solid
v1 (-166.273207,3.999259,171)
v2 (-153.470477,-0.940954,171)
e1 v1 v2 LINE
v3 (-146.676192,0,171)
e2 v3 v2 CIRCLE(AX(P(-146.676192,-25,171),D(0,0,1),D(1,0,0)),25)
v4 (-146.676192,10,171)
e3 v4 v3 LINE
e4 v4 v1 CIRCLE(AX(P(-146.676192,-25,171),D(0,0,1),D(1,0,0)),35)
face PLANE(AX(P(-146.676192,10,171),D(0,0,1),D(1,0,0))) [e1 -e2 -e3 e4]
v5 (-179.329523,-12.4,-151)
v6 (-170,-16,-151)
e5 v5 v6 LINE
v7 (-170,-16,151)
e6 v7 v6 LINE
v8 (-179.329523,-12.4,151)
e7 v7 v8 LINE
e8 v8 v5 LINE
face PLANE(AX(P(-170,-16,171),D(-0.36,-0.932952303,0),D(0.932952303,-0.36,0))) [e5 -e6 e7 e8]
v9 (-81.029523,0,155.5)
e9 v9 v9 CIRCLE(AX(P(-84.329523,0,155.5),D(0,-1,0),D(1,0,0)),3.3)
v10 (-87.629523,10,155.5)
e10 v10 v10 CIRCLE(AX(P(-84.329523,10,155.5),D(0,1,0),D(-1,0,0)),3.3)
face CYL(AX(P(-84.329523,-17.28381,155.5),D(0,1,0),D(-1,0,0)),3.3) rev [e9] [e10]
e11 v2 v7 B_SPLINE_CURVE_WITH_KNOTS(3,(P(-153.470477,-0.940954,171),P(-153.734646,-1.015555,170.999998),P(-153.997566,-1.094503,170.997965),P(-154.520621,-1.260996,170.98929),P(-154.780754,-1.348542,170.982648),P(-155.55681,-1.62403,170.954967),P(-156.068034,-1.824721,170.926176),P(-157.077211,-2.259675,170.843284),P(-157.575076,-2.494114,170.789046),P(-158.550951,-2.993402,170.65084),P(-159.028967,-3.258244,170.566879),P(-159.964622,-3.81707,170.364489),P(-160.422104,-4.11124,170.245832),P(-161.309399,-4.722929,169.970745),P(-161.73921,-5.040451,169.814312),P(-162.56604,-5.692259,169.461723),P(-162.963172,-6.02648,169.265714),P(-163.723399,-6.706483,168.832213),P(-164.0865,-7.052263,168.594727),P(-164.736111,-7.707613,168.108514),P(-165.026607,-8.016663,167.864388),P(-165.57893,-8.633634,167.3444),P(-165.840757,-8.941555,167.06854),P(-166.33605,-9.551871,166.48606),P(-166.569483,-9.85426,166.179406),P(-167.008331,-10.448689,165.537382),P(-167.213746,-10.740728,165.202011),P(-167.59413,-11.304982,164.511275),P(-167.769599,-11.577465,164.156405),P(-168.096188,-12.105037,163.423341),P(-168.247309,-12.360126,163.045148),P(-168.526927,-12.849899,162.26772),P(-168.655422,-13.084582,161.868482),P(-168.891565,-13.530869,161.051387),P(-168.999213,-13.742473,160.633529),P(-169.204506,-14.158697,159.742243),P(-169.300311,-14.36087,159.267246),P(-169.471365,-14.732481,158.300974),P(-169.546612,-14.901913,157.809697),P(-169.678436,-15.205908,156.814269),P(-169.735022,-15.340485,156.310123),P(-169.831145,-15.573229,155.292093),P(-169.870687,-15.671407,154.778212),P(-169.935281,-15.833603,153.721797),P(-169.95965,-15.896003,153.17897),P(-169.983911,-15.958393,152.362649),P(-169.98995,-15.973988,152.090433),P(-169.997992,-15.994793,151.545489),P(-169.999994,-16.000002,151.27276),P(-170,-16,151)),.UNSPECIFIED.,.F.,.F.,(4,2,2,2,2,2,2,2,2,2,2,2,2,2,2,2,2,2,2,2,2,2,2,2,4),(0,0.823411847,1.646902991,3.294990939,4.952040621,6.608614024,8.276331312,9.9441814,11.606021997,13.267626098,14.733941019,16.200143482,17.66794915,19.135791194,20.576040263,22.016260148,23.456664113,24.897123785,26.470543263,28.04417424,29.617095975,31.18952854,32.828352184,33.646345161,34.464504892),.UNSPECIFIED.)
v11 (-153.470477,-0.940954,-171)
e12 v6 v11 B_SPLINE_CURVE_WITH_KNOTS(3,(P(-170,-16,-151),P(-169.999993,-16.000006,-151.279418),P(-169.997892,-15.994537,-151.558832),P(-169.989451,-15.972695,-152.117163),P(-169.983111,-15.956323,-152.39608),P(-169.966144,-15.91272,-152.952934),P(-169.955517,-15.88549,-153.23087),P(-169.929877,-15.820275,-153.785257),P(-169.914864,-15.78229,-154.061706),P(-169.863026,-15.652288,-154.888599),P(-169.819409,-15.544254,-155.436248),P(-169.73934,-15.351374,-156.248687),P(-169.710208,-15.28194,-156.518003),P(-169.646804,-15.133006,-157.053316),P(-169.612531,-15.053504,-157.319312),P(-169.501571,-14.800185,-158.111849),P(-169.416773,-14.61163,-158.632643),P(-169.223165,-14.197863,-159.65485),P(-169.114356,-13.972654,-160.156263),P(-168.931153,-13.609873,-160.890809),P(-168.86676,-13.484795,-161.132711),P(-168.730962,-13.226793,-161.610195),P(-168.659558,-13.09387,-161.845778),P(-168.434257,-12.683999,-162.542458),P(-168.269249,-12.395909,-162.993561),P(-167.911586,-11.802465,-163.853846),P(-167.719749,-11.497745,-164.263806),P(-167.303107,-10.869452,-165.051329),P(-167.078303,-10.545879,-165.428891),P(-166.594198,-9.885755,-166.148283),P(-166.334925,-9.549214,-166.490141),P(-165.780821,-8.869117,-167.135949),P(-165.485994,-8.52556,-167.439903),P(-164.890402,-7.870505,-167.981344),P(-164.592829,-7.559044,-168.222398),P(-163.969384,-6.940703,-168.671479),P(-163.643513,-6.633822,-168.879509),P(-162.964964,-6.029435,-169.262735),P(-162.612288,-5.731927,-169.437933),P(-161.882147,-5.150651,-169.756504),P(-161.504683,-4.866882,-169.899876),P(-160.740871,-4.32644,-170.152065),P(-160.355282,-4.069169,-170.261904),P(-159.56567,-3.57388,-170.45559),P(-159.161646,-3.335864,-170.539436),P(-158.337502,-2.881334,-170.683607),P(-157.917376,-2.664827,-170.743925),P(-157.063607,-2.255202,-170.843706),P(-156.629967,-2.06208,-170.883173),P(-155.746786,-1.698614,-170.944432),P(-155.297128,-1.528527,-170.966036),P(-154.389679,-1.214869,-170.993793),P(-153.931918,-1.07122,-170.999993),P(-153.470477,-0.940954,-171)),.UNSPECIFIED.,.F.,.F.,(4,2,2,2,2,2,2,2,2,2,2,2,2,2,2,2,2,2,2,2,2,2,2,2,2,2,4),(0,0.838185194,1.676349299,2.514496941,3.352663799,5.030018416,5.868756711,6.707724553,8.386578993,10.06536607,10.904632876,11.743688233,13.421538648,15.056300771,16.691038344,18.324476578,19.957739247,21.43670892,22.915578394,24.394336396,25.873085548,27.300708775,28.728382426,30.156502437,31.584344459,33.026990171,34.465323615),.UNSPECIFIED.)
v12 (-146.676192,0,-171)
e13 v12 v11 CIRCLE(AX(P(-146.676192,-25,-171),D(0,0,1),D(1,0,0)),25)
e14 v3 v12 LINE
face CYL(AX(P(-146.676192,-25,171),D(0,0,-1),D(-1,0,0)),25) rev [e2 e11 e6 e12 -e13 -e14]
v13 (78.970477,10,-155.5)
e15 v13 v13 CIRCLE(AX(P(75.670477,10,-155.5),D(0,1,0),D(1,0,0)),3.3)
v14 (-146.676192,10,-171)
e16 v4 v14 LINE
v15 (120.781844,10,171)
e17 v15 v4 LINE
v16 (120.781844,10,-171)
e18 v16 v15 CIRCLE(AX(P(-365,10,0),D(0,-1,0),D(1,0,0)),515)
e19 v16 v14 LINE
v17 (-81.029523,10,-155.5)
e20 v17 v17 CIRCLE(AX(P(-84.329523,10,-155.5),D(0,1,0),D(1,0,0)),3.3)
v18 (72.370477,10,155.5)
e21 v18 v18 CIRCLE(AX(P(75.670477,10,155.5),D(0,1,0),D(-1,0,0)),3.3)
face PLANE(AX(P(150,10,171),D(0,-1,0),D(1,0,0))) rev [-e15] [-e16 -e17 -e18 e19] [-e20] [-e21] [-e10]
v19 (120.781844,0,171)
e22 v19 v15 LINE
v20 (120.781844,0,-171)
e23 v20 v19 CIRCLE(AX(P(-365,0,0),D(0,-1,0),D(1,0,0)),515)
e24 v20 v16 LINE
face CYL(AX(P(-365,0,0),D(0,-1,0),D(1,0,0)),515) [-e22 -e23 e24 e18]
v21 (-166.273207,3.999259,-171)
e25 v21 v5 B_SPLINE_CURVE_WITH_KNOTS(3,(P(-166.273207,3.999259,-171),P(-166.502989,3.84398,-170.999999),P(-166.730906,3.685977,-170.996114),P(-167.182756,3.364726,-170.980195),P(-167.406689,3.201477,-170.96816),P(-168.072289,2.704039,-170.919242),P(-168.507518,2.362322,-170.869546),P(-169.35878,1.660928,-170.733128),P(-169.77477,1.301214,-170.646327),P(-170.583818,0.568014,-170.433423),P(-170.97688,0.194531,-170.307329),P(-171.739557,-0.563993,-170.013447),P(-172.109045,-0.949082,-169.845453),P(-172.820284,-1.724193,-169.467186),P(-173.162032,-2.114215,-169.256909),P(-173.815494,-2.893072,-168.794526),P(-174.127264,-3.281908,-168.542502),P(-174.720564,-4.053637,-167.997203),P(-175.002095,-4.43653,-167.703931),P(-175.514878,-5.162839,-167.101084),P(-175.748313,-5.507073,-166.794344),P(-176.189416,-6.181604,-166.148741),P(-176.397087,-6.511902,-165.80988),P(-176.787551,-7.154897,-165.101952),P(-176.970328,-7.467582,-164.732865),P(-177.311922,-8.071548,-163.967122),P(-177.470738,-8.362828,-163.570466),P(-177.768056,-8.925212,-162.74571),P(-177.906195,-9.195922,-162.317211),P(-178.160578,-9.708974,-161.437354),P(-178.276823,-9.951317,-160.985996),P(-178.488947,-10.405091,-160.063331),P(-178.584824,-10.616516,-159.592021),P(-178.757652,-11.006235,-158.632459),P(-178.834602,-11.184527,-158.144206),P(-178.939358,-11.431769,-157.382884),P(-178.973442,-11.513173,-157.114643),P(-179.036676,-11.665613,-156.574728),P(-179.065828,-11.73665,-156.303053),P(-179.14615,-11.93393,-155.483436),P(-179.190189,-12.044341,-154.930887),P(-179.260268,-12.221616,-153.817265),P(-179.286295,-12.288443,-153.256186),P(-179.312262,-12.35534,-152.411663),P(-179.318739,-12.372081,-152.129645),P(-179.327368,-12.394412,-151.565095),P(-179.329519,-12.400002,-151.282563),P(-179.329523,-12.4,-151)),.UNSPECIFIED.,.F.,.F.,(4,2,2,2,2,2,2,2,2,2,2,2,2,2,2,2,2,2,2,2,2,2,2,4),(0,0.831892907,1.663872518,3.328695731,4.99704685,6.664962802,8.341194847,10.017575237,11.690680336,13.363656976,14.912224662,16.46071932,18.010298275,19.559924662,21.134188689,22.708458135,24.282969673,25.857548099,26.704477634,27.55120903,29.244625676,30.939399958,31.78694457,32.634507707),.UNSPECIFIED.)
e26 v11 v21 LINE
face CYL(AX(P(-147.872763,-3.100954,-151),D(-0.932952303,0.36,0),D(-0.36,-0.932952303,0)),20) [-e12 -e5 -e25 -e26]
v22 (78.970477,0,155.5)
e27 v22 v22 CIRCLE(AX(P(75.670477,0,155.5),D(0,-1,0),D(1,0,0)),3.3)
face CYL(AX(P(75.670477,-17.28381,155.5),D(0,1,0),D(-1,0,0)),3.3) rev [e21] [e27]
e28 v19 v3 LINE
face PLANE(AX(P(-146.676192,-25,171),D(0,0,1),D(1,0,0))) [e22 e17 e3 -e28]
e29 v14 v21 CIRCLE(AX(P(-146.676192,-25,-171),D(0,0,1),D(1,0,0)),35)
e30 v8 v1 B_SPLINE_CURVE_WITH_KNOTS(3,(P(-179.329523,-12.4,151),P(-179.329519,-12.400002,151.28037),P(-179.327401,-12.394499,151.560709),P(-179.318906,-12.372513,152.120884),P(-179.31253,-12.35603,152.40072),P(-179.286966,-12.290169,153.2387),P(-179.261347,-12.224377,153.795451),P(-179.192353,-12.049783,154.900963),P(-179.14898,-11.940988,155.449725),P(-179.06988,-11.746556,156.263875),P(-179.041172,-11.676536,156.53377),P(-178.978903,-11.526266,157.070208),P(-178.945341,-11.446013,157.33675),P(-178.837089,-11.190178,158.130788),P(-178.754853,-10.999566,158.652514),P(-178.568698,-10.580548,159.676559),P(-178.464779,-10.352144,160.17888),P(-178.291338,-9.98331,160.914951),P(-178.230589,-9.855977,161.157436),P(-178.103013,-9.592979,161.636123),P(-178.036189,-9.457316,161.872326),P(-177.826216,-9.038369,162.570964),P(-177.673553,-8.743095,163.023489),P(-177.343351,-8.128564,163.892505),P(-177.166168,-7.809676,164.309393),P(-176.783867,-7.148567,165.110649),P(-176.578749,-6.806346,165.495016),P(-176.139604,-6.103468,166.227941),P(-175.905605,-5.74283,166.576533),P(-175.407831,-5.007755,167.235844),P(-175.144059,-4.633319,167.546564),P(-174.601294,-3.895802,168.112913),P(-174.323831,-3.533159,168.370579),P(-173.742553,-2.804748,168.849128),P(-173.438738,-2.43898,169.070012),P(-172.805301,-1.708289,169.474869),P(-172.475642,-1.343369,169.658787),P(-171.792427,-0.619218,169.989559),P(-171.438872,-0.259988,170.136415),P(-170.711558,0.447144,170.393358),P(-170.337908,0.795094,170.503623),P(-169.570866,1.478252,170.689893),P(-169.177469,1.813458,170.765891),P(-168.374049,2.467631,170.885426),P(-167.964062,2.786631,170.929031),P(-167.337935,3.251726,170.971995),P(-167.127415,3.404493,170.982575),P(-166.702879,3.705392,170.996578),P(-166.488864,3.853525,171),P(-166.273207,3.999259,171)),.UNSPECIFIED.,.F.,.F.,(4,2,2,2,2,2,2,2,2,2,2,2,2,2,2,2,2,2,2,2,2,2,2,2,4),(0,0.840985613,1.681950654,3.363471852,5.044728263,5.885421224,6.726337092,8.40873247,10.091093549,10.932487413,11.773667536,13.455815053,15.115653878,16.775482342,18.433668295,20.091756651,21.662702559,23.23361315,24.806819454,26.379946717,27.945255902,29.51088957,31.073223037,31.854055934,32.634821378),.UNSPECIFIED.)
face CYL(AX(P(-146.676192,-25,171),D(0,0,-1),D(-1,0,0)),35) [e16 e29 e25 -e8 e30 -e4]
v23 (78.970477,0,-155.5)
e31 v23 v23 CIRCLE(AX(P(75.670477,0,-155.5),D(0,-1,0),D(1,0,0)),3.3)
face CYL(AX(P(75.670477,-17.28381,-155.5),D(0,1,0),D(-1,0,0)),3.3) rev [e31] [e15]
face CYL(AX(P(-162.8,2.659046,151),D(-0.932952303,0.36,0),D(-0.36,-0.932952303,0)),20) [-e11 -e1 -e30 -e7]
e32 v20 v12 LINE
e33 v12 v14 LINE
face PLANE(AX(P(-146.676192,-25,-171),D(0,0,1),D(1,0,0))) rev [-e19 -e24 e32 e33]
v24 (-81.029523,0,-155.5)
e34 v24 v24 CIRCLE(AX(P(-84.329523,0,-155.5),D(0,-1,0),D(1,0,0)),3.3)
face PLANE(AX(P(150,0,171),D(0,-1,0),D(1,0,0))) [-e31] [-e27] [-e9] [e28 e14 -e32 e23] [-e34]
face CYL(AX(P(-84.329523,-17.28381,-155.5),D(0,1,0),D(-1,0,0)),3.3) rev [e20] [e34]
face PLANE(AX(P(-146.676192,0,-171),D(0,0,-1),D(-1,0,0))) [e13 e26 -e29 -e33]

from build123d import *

# Parameters (mm, degrees)
SM_BASE_FLANGE_1_DEPTH = 171
SKETCH_5_OUTSIDE_W     = 426.43
SKETCH_5_OUTSIDE_H     = 439.1
SKETCH_5_OUTSIDE_R     = 515
CUT_EXTRUDE_2_DEPTH    = 250.150713085
FILLET_1_R             = 20
SKETCH_9_R             = 3.3
CUT_EXTRUDE_4_DEPTH    = 250.150713236


# Sheet-metal steps are written as plain solids
with BuildPart() as part:
    # Sketch 1 → Базовая кромка1 (new, symmetric)
    with BuildSketch(Plane.XY):
        with BuildLine():
            Line((150, 0), (-146.676192421, 0))
            ThreePointArc((-146.676192421, 0), (-160.818328044, -4.384471872), (-170, -16))
            Line((-170, -16), (-179.329523032, -12.4))
            ThreePointArc((-179.329523032, -12.4), (-166.475182294, 3.861739379), (-146.676192421, 10))
            Line((-146.676192421, 10), (150, 10))
            Line((150, 10), (150, 0))
        make_face()
    extrude(amount=SM_BASE_FLANGE_1_DEPTH, both=True)

    # Эскиз5 outside → Вырез-Вытянуть2 (cut, through all)
    with BuildSketch(Plane(origin=(0, 10, 0), x_dir=(1, 0, 0), z_dir=(0, 1, 0))):
        with Locations((-14.665, 0)):
            Rectangle(SKETCH_5_OUTSIDE_W, SKETCH_5_OUTSIDE_H)
        with Locations((-365, 0)):
            Circle(SKETCH_5_OUTSIDE_R, mode=Mode.SUBTRACT)
    extrude(amount=-CUT_EXTRUDE_2_DEPTH, mode=Mode.SUBTRACT)


with BuildPart() as cut_extrude_2_kept_piece:
    # of the separate pieces the step leaves, the one the design keeps (cut_extrude_2_pieces_kept)
    add(part.part.solids().sort_by_distance((-146.676192421, 10, -171))[0])

    # Скругление1
    fillet_1_edges = [cut_extrude_2_kept_piece.edges().sort_by_distance(p)[0] for p in [
        (-174.664761516, -14.2, -171),
        (-174.664761516, -14.2, 171),
    ]]
    fillet(fillet_1_edges, radius=FILLET_1_R)

    # Эскиз9 → Вырез-Вытянуть4 (cut, through all)
    with BuildSketch(Plane(origin=(0, 10, 0), x_dir=(1, 0, 0), z_dir=(0, 1, 0))):
        with Locations(Location((75.670476968, -155.5, 0), (0, 0, 180))):
            Circle(SKETCH_9_R)
        with Locations(Location((-84.329523032, -155.5, 0), (0, 0, 180))):
            Circle(SKETCH_9_R)
        with Locations((-84.329523032, 155.5)):
            Circle(SKETCH_9_R)
        with Locations((75.670476968, 155.5)):
            Circle(SKETCH_9_R)
    extrude(amount=-CUT_EXTRUDE_4_DEPTH, mode=Mode.SUBTRACT)


solid = cut_extrude_2_kept_piece.part
